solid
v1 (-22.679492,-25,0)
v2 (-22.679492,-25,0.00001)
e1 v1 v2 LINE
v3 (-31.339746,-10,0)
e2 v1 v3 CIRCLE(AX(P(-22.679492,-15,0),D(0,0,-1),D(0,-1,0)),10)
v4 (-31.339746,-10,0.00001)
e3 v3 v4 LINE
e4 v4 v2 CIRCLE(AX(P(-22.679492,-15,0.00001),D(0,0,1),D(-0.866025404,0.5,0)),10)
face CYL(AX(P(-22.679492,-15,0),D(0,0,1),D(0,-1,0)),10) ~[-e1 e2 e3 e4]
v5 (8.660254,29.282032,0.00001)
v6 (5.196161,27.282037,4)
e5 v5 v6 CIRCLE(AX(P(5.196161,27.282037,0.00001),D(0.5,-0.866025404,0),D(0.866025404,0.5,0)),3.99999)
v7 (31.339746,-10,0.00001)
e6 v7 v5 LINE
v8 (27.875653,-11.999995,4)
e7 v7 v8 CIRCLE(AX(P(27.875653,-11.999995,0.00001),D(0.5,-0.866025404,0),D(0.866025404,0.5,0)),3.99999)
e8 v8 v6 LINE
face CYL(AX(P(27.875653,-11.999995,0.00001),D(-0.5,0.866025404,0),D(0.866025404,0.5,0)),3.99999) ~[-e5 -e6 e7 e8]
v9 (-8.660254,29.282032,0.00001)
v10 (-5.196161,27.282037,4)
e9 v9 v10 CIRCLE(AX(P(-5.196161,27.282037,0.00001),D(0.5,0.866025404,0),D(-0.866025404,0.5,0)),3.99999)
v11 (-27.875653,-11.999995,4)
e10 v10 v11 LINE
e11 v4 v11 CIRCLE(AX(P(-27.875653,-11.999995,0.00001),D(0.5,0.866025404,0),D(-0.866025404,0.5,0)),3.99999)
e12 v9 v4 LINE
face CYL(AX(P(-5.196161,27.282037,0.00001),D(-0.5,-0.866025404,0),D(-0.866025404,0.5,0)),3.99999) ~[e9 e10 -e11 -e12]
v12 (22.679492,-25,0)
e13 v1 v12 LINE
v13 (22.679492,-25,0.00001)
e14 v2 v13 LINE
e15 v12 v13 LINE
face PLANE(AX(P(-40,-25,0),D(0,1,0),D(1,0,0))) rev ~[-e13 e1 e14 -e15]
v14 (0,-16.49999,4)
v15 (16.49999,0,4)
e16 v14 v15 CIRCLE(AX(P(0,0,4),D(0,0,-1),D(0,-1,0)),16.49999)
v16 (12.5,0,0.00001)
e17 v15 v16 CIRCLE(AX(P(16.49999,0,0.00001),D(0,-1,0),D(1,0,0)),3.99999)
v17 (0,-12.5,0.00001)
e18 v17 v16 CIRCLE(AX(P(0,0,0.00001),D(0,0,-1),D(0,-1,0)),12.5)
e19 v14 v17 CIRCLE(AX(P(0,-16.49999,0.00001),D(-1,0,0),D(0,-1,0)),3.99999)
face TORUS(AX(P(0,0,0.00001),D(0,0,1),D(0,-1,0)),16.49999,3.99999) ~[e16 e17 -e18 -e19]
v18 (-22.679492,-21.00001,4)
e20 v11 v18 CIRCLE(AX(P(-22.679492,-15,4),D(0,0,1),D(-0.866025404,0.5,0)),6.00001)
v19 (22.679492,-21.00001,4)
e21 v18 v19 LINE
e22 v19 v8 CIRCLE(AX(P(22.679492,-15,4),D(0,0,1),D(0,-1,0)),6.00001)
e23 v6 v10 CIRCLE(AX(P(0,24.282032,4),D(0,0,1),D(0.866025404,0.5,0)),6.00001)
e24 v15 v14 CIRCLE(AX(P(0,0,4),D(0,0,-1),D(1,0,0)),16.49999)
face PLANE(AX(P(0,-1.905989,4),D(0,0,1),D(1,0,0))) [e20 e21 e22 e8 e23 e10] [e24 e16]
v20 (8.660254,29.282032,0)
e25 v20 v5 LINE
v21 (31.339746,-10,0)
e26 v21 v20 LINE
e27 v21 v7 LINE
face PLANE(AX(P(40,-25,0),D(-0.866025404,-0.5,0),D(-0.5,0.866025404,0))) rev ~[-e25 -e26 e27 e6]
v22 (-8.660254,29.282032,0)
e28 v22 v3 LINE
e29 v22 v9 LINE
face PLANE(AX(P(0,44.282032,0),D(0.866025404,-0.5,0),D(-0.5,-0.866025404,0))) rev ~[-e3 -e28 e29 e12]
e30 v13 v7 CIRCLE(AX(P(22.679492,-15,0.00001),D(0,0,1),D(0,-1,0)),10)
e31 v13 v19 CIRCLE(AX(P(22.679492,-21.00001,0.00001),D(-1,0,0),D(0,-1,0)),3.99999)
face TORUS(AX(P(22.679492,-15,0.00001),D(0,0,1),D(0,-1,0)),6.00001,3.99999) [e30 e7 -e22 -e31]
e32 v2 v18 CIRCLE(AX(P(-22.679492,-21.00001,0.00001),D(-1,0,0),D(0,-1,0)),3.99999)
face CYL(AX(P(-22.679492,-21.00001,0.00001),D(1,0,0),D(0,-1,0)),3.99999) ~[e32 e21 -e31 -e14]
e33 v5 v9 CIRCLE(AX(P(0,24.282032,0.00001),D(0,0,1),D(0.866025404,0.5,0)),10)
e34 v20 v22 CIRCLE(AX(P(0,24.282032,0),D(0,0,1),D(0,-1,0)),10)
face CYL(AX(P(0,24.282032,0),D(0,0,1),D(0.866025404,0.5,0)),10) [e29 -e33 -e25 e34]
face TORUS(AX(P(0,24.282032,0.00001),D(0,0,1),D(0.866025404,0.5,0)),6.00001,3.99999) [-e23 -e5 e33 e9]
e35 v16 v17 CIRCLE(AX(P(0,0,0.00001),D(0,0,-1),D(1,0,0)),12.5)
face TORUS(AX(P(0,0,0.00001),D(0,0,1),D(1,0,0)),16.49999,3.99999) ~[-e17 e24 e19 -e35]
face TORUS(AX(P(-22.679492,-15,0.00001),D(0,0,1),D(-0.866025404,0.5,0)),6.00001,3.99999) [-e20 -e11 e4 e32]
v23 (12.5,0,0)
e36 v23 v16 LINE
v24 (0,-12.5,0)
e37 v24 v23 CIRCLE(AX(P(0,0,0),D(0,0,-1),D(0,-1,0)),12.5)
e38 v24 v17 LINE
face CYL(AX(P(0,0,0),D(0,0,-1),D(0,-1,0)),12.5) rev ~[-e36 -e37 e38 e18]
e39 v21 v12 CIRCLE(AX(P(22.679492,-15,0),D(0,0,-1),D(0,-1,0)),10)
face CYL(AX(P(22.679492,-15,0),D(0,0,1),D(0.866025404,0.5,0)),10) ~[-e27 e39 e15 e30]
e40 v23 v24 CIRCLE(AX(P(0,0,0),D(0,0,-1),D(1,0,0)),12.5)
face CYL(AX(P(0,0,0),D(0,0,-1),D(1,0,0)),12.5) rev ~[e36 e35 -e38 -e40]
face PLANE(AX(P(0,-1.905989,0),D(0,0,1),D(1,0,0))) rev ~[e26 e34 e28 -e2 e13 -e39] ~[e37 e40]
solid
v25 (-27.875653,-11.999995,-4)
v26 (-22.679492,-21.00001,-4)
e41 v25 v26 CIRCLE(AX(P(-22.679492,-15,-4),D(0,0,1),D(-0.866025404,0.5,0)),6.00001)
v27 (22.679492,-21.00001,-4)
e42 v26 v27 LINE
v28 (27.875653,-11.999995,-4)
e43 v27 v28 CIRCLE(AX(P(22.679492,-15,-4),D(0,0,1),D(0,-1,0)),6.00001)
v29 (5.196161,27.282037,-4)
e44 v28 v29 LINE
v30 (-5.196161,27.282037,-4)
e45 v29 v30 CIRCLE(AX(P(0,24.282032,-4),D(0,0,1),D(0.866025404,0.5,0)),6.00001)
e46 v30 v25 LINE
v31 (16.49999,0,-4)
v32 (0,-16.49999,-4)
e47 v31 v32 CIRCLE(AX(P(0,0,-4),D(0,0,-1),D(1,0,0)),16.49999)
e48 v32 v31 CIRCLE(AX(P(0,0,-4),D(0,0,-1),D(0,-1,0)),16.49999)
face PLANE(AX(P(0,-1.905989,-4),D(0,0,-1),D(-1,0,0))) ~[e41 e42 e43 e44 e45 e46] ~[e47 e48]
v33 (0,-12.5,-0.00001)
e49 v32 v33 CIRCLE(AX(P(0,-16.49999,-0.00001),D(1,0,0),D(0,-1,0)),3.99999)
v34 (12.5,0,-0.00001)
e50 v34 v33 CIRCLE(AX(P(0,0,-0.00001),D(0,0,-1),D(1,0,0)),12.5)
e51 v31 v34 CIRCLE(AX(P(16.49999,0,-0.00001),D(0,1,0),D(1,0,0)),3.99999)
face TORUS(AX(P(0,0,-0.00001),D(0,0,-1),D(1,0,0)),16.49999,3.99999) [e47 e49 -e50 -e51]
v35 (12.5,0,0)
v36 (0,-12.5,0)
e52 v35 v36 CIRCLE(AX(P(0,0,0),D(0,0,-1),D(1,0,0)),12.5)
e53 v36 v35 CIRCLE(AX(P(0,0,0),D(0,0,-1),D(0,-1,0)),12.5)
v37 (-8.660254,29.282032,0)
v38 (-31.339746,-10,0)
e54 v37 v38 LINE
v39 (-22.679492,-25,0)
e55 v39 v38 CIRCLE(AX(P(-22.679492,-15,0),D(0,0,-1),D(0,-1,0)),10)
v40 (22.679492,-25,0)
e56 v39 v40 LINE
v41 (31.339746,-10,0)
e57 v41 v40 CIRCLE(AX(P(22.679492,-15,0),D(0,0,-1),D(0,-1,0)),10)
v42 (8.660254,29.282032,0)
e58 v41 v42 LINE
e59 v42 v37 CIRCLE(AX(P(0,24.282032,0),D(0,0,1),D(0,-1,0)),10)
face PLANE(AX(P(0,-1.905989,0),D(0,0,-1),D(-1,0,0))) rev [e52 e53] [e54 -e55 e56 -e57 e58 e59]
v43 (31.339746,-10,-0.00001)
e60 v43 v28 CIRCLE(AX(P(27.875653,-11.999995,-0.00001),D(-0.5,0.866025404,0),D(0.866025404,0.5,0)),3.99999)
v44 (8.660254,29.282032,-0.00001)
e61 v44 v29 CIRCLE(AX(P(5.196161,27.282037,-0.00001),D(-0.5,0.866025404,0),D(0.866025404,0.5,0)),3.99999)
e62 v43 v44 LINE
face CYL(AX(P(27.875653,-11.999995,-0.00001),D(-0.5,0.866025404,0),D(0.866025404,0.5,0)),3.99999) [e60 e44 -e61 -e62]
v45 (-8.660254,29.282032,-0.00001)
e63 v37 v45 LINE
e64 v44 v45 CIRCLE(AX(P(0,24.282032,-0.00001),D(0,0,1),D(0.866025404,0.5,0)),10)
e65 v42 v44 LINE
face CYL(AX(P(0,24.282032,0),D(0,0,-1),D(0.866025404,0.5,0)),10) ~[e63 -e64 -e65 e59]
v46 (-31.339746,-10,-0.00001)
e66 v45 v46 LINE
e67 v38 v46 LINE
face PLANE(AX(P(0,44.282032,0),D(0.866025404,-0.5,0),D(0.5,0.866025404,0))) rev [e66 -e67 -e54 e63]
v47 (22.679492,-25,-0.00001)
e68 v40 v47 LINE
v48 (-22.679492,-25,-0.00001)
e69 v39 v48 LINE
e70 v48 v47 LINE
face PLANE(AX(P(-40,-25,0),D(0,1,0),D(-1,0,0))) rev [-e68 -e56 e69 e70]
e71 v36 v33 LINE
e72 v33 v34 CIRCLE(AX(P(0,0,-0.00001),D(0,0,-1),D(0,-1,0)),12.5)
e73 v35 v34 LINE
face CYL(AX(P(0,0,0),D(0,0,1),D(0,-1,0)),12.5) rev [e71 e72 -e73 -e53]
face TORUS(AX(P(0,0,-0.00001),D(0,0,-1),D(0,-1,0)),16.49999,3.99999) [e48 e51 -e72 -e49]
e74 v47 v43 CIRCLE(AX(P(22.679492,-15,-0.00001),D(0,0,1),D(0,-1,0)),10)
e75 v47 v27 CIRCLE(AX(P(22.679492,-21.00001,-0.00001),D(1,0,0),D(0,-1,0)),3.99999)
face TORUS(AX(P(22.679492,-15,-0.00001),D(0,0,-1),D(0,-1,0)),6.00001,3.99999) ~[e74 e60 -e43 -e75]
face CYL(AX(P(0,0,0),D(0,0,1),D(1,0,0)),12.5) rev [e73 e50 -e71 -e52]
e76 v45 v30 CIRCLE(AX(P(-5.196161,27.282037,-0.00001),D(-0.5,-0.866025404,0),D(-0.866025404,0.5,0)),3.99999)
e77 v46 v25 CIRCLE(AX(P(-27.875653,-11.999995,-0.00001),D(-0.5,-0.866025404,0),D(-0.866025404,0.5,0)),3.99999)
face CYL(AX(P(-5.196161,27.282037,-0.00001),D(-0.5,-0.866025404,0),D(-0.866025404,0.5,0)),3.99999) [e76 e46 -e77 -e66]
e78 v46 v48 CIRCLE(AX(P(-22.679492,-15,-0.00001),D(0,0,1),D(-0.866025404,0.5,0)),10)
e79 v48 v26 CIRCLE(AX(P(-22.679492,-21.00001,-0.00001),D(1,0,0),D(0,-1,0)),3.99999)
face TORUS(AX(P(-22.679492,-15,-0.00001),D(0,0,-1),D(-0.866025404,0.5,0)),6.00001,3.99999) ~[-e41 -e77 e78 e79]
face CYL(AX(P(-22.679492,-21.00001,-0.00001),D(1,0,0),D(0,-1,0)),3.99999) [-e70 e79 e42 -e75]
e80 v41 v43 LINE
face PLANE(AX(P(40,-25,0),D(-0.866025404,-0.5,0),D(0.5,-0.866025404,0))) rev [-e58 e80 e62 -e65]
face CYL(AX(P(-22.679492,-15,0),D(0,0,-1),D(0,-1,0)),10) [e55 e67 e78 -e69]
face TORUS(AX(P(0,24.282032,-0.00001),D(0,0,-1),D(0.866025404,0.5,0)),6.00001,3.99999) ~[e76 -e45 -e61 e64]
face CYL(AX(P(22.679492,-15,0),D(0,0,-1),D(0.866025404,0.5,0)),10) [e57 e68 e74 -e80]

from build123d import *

# Parameters (mm, degrees)
F1_DEPTH = 4
F2_R     = 10
F3_R     = 3.99999


# Not quite as in the source:
# - a fillet or chamfer is up to 0.001 mm smaller than in the source, because OpenCascade refuses the exact size


with BuildPart() as f1:
    # F0 (on Top) → F1 (new body)
    with BuildSketch(Plane.XY):
        Polygon((40, -25), (0, 44.2820323028), (-40, -25), (0, -25), align=None)
        with BuildLine():
            ThreePointArc((12.5, 0), (8.8388347648, -8.8388347648), (0, -12.5))
            ThreePointArc((0, -12.5), (-8.8388347648, 8.8388347648), (12.5, 0))
        make_face(mode=Mode.SUBTRACT)
    extrude(amount=F1_DEPTH)

    # F2
    f2_edges = [f1.edges().sort_by_distance(p)[0] for p in [
        (0, 44.282032, 2),
        (-40, -25, 2),
        (40, -25, 2),
    ]]
    fillet(f2_edges, radius=F2_R)

    # F3 (radius 4 in the source; OpenCascade refuses exactly that, so slightly less here)
    f3_edges = [f1.edges().sort_by_distance(p)[0] for p in [
        (-12.5, 0, 4),
        (20, 9.641016, 4),
        (31.339746, -20, 4),
        (0, 34.282032, 4),
        (0, -25, 4),
        (-20, 9.641016, 4),
        (-31.339746, -20, 4),
    ]]
    fillet(f3_edges, radius=F3_R)


with BuildPart() as f4_1:
    # F4: instance of F1
    add(f1.part.mirror(Plane.XY))


solid = Compound([f1.part, f4_1.part])
